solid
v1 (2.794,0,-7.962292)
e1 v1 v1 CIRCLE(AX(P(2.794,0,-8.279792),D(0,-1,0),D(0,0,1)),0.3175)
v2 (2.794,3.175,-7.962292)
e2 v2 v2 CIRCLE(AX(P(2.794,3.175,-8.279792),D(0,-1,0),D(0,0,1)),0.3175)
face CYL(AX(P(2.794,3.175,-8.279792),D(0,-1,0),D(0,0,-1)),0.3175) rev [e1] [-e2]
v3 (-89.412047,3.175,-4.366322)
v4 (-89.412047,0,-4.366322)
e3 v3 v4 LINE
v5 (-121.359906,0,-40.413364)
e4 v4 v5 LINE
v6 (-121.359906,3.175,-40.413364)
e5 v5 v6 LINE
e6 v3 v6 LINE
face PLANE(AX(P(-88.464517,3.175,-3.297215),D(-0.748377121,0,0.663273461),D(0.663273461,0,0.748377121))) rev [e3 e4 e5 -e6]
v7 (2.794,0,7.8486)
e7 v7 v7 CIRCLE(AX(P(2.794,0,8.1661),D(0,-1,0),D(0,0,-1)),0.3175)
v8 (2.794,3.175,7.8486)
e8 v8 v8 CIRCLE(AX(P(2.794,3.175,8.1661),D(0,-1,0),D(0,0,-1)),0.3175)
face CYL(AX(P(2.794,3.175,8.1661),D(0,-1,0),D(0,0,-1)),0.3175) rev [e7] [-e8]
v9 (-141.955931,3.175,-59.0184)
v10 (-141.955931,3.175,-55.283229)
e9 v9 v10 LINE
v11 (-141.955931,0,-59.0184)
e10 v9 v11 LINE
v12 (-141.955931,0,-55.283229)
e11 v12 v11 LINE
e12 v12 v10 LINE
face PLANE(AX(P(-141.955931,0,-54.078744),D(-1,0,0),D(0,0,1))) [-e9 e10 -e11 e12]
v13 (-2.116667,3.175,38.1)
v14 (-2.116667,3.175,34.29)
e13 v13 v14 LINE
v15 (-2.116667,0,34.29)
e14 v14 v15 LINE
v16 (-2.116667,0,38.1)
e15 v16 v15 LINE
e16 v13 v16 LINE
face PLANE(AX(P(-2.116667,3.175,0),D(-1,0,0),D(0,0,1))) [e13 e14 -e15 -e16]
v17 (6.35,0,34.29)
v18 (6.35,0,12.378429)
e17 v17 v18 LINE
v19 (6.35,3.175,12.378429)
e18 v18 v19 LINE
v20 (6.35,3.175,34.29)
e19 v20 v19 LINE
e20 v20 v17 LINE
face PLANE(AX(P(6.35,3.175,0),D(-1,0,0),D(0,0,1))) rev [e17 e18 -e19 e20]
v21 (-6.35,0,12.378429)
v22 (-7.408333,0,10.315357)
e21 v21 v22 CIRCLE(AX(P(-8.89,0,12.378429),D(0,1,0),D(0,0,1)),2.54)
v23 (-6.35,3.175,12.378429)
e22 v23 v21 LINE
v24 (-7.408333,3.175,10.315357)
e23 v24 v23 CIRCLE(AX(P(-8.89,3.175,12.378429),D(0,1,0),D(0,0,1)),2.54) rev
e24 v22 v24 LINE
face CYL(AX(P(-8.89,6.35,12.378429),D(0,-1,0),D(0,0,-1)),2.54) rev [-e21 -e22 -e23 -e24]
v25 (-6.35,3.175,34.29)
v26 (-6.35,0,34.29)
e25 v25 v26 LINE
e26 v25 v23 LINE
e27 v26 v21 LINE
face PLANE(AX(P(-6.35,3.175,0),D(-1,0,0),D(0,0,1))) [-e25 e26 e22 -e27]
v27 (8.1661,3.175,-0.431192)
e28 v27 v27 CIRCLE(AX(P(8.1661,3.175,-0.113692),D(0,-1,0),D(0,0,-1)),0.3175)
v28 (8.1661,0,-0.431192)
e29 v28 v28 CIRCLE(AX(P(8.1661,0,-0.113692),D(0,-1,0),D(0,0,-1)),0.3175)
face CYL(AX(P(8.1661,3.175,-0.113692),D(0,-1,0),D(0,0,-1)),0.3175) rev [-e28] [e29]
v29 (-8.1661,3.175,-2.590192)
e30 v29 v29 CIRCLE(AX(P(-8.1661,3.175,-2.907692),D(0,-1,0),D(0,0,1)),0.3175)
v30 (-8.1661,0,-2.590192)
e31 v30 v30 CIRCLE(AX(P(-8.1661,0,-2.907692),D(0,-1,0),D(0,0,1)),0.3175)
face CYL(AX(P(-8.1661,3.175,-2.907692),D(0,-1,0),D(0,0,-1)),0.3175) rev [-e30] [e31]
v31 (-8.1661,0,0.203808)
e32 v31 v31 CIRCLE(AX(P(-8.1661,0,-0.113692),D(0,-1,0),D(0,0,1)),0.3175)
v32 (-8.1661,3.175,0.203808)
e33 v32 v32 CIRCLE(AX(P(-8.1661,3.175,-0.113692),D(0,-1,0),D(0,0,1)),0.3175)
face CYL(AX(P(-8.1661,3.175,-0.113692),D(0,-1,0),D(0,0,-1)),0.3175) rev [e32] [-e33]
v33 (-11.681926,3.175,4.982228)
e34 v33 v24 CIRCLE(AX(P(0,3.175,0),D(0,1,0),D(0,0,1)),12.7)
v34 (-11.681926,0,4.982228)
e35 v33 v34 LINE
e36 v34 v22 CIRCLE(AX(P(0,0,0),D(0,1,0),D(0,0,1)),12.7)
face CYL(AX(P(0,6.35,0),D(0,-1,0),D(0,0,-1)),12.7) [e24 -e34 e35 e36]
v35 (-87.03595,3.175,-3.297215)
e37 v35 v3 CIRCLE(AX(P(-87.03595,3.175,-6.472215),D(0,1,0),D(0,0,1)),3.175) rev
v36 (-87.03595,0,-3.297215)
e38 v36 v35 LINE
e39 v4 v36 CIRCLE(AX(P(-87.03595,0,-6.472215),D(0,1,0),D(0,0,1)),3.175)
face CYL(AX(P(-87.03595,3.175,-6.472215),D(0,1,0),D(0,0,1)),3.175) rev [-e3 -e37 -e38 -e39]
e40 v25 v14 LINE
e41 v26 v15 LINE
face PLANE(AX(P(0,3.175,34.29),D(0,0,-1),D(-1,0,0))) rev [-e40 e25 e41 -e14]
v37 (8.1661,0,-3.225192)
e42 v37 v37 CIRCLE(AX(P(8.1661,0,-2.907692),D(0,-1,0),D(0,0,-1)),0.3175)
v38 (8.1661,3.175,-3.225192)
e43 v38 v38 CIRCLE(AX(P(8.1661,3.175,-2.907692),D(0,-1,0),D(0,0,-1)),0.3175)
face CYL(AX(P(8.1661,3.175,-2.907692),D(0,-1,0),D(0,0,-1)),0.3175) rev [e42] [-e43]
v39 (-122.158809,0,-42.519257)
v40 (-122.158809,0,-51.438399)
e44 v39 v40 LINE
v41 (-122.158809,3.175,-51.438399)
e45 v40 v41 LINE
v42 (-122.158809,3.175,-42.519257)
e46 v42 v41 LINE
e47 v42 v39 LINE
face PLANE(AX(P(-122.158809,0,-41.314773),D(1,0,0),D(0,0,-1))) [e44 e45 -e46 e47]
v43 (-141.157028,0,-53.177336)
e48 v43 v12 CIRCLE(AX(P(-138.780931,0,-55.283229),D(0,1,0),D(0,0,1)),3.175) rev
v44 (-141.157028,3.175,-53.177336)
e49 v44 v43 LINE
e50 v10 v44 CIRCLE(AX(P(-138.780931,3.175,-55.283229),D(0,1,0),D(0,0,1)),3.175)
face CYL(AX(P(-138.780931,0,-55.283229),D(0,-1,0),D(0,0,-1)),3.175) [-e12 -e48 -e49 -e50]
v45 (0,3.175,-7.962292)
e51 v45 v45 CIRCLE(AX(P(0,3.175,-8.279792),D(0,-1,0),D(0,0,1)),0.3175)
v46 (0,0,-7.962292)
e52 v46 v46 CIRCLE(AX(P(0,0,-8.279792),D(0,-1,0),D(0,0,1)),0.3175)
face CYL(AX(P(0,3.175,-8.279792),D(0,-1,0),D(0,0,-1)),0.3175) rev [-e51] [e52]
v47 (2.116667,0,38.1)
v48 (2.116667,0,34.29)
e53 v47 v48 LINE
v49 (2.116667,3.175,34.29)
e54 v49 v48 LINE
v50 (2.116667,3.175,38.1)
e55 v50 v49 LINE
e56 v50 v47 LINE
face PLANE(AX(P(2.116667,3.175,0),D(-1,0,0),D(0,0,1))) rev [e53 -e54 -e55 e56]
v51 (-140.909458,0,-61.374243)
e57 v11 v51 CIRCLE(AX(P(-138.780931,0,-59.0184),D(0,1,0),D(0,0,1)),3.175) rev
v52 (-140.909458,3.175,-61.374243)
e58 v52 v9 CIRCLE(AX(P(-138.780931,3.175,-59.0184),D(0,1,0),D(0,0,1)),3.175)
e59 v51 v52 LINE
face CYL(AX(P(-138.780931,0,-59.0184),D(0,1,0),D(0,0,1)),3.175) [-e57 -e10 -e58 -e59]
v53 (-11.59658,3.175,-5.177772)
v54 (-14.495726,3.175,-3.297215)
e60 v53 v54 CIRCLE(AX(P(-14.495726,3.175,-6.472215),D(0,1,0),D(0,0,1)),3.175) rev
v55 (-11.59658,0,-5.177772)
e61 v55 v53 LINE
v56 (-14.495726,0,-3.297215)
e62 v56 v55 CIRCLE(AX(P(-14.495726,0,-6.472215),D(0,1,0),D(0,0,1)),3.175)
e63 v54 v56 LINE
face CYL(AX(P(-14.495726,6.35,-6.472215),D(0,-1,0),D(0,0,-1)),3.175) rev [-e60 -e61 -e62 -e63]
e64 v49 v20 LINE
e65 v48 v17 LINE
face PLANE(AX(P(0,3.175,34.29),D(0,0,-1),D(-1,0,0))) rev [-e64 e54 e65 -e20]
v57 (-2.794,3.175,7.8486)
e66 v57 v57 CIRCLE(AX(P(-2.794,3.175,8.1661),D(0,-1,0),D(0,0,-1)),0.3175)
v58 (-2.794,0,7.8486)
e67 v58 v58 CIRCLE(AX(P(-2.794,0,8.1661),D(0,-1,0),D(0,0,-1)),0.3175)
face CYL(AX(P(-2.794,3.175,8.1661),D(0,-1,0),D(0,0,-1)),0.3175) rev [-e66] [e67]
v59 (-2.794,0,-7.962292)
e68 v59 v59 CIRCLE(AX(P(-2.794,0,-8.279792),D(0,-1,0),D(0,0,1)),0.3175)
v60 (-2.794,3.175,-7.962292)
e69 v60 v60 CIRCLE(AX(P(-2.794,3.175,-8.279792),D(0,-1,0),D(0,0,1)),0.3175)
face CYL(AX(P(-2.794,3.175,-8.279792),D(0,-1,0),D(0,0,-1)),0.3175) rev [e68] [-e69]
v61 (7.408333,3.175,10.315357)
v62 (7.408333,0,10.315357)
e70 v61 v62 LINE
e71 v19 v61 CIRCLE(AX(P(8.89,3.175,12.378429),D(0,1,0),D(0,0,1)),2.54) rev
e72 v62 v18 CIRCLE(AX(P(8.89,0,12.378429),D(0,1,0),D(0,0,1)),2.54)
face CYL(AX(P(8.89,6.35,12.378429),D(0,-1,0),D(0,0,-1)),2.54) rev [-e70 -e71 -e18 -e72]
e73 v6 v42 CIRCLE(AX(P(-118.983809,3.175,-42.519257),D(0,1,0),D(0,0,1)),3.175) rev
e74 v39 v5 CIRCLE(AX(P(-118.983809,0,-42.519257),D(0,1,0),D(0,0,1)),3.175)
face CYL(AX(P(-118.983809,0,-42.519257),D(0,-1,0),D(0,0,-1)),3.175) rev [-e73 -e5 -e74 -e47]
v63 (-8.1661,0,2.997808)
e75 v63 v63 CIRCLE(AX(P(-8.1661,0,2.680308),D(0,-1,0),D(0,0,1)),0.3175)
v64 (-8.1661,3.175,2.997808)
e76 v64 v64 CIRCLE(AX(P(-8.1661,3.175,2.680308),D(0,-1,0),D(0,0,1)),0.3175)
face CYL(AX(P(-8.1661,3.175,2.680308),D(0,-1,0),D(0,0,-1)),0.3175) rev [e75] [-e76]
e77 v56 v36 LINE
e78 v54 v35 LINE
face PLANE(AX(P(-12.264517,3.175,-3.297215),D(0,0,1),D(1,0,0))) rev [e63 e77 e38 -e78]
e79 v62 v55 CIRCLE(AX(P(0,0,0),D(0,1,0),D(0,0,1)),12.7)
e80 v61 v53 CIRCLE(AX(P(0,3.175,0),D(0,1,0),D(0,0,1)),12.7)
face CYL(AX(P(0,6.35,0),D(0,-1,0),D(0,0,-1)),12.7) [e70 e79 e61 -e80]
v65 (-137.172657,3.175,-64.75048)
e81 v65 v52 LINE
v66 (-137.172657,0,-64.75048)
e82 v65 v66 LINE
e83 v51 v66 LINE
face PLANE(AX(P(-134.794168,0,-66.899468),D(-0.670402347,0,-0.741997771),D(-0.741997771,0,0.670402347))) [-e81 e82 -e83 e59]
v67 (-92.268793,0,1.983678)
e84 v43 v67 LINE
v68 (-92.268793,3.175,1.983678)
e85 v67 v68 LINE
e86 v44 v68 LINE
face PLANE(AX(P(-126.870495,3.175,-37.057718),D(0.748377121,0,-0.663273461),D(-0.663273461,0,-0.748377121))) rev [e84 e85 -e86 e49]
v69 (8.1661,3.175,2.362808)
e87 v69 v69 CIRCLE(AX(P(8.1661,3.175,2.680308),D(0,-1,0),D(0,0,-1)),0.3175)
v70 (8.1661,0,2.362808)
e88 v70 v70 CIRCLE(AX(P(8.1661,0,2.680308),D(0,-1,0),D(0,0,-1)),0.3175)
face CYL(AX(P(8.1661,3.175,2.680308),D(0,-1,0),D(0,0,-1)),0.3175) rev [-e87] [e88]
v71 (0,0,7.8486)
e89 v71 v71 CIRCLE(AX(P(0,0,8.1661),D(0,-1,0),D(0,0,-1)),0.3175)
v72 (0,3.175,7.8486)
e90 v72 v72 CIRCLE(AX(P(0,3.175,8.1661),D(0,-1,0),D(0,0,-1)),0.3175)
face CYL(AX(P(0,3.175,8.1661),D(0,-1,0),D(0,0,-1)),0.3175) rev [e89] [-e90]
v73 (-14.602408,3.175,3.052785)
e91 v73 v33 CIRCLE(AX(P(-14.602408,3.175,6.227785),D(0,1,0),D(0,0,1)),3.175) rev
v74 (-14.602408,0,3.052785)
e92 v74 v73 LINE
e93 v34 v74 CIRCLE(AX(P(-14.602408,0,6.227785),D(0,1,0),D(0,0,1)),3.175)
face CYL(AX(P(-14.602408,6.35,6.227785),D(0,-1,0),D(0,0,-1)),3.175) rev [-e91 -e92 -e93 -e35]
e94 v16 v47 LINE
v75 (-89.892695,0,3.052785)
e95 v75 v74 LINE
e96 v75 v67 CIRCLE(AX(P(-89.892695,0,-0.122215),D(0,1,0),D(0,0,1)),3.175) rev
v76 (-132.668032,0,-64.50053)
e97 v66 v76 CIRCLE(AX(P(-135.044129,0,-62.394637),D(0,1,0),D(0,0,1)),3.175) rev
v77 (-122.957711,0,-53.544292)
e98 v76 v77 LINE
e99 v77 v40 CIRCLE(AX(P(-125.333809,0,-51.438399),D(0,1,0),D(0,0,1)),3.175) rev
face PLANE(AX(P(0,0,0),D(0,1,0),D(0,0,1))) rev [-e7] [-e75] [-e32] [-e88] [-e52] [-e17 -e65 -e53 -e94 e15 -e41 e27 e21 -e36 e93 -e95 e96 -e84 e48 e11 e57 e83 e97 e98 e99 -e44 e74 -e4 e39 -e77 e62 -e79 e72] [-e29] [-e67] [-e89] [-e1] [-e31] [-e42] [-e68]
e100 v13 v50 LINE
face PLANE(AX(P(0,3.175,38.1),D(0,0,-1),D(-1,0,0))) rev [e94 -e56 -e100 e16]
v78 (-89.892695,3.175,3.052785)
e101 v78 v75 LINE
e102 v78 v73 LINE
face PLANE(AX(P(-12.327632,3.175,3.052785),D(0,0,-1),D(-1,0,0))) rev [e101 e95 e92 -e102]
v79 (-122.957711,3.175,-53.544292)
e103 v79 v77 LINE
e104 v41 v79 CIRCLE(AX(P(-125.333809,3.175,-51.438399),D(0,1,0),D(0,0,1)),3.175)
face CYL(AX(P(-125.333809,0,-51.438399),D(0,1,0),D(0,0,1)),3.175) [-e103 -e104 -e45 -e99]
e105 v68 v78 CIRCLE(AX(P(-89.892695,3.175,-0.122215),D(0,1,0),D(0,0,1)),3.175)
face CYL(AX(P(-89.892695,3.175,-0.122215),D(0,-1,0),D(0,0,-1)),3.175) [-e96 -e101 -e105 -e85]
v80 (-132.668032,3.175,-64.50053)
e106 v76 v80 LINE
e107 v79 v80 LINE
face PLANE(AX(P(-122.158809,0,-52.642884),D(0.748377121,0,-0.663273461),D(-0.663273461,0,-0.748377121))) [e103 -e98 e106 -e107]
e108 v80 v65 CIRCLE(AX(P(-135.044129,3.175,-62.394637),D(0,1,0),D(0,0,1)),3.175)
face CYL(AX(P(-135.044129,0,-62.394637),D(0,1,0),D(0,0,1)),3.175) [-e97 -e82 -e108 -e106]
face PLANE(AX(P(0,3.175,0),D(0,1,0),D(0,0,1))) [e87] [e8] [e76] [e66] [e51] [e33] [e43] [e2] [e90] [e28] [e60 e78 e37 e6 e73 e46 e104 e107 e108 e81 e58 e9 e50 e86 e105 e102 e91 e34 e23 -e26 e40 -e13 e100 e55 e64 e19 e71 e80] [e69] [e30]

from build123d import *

# Parameters (mm, degrees)
STOCK_RECORD_NEEDLE_1_DEPTH     = 3.175
FILLET1_R                       = 3.175
X_Z_TURN_SKETCH_W               = 4.233333334
X_Z_TURN_SKETCH_H               = 3.81
X_Y_TURN_DEPTH                  = 3.175
FILLET2_R                       = 2.54
RIGHT_START                     = -3.175
RIGHT_SIDE_DELETE_DEPTH         = 3.175
SERVO_HORN_MOUNT_HOLES_SKETCH_R = 0.3175
SERVO_HORN_MOUNT_HOLES_DEPTH    = 157.399949281


# Read off the part's stored shape, not the designer's step: Stock-Record Needle-1
with BuildPart() as part:
    # Stock-Record Needle-1 outline → Stock-Record Needle-1 (new body)
    with BuildSketch(Plane(origin=(0, 0, 0), x_dir=(1, 0, 0), z_dir=(0, 1, 0))):
        with BuildLine():
            Line((-12.264516886, 3.297214818), (-88.464516886, 3.297214818))
            Line((-88.464516886, 3.297214818), (-122.158808708, 41.314772585))
            Line((-122.158808708, 41.314772585), (-122.158808708, 52.642883574))
            Line((-122.158808708, 52.642883574), (-134.794168142, 66.899467737))
            Line((-134.794168142, 66.899467737), (-141.955930631, 60.428744281))
            Line((-141.955930631, 60.428744281), (-141.955930631, 54.078744281))
            Line((-141.955930631, 54.078744281), (-91.321262361, -3.052785182))
            Line((-91.321262361, -3.052785182), (-12.327631672, -3.052785182))
            ThreePointArc((-12.327631672, -3.052785182), (12.699372727, -0.126223338), (-12.264516886, 3.297214818))
        make_face()
    extrude(amount=STOCK_RECORD_NEEDLE_1_DEPTH)

    # Fillet1
    fillet1_edges = [part.edges().sort_by_distance(p)[0] for p in [
        (-122.158808708, 1.5875, -52.642883574),
        (-134.794168142, 1.5875, -66.899467737),
        (-141.955930631, 1.5875, -60.428744281),
        (-141.955930631, 1.5875, -54.078744281),
        (-12.327631672, 1.5875, 3.052785182),
        (-12.264516886, 1.5875, -3.297214818),
        (-88.464516886, 1.5875, -3.297214818),
        (-122.158808708, 1.5875, -41.314772585),
        (-91.321262361, 1.5875, 3.052785182),
    ]]
    fillet(fillet1_edges, radius=FILLET1_R)

    # X-Z Turn Sketch' → X-Y Turn (add)
    with BuildSketch(Plane(origin=(0, 0, 0), x_dir=(1, 0, 0), z_dir=(0, 1, 0))):
        Polygon((-6.35, 34.29), (-2.116666667, 34.29), (-2.116666667, 38.1), (2.116666667, 38.1), (2.116666667, 34.29), (6.35, 34.29), (6.35, -34.29), (2.116666667, -34.29), (-2.116666667, -34.29), (-6.35, -34.29), align=None)
        with Locations((0, -36.195)):
            Rectangle(X_Z_TURN_SKETCH_W, X_Z_TURN_SKETCH_H)
    extrude(amount=X_Y_TURN_DEPTH)

    # Fillet2
    fillet2_edges = [part.edges().sort_by_distance(p)[0] for p in [
        (6.35, 1.5875, -10.998522627),
        (6.35, 1.5875, 10.998522628),
        (-6.35, 1.5875, -10.998522628),
        (-6.35, 1.5875, 10.998522629),
    ]]
    fillet(fillet2_edges, radius=FILLET2_R)

    # Sketch2 → Right Side Delete (cut)
    with BuildSketch(Plane(origin=(0, 3.175, 0), x_dir=(1, 0, 0), z_dir=(0, 1, 0)).offset(RIGHT_START)):
        with BuildLine():
            Line((11.695597813, 4.950049677), (11.695597813, 35.504326251))
            Line((11.695597813, 35.504326251), (11.695597813, 40.086272904))
            Line((11.695597813, 40.086272904), (-12.040083059, 40.086272904))
            Line((-12.040083059, 40.086272904), (-9.843545264, 8.024625639))
            ThreePointArc((-9.843545264, 8.024625639), (1.79465289, 12.572558252), (11.695597813, 4.950049677))
        make_face()
    extrude(amount=RIGHT_SIDE_DELETE_DEPTH, mode=Mode.SUBTRACT)

    # Servo Horn Mount Holes Sketch → Servo Horn Mount Holes (cut, through all)
    with BuildSketch(Plane.XZ):
        with Locations(Location((0, 8.1661, 0), (0, 0, 270))):
            Circle(SERVO_HORN_MOUNT_HOLES_SKETCH_R)
        with Locations(Location((2.794, 8.1661, 0), (0, 0, 270))):
            Circle(SERVO_HORN_MOUNT_HOLES_SKETCH_R)
        with Locations(Location((-2.794, 8.1661, 0), (0, 0, 270))):
            Circle(SERVO_HORN_MOUNT_HOLES_SKETCH_R)
        with Locations(Location((2.794, -8.279792428, 0), (0, 0, 90))):
            Circle(SERVO_HORN_MOUNT_HOLES_SKETCH_R)
        with Locations(Location((0, -8.279792428, 0), (0, 0, 90))):
            Circle(SERVO_HORN_MOUNT_HOLES_SKETCH_R)
        with Locations(Location((-2.794, -8.279792428, 0), (0, 0, 90))):
            Circle(SERVO_HORN_MOUNT_HOLES_SKETCH_R)
        with Locations(Location((8.1661, -0.113692428, 0), (0, 0, 270))):
            Circle(SERVO_HORN_MOUNT_HOLES_SKETCH_R)
        with Locations(Location((8.1661, 2.680307572, 0), (0, 0, 270))):
            Circle(SERVO_HORN_MOUNT_HOLES_SKETCH_R)
        with Locations(Location((8.1661, -2.907692428, 0), (0, 0, 270))):
            Circle(SERVO_HORN_MOUNT_HOLES_SKETCH_R)
        with Locations(Location((-8.1661, -2.907692428, 0), (0, 0, 90))):
            Circle(SERVO_HORN_MOUNT_HOLES_SKETCH_R)
        with Locations(Location((-8.1661, 2.680307572, 0), (0, 0, 90))):
            Circle(SERVO_HORN_MOUNT_HOLES_SKETCH_R)
        with Locations(Location((-8.1661, -0.113692428, 0), (0, 0, 90))):
            Circle(SERVO_HORN_MOUNT_HOLES_SKETCH_R)
    extrude(amount=-SERVO_HORN_MOUNT_HOLES_DEPTH, mode=Mode.SUBTRACT)


solid = part.part
